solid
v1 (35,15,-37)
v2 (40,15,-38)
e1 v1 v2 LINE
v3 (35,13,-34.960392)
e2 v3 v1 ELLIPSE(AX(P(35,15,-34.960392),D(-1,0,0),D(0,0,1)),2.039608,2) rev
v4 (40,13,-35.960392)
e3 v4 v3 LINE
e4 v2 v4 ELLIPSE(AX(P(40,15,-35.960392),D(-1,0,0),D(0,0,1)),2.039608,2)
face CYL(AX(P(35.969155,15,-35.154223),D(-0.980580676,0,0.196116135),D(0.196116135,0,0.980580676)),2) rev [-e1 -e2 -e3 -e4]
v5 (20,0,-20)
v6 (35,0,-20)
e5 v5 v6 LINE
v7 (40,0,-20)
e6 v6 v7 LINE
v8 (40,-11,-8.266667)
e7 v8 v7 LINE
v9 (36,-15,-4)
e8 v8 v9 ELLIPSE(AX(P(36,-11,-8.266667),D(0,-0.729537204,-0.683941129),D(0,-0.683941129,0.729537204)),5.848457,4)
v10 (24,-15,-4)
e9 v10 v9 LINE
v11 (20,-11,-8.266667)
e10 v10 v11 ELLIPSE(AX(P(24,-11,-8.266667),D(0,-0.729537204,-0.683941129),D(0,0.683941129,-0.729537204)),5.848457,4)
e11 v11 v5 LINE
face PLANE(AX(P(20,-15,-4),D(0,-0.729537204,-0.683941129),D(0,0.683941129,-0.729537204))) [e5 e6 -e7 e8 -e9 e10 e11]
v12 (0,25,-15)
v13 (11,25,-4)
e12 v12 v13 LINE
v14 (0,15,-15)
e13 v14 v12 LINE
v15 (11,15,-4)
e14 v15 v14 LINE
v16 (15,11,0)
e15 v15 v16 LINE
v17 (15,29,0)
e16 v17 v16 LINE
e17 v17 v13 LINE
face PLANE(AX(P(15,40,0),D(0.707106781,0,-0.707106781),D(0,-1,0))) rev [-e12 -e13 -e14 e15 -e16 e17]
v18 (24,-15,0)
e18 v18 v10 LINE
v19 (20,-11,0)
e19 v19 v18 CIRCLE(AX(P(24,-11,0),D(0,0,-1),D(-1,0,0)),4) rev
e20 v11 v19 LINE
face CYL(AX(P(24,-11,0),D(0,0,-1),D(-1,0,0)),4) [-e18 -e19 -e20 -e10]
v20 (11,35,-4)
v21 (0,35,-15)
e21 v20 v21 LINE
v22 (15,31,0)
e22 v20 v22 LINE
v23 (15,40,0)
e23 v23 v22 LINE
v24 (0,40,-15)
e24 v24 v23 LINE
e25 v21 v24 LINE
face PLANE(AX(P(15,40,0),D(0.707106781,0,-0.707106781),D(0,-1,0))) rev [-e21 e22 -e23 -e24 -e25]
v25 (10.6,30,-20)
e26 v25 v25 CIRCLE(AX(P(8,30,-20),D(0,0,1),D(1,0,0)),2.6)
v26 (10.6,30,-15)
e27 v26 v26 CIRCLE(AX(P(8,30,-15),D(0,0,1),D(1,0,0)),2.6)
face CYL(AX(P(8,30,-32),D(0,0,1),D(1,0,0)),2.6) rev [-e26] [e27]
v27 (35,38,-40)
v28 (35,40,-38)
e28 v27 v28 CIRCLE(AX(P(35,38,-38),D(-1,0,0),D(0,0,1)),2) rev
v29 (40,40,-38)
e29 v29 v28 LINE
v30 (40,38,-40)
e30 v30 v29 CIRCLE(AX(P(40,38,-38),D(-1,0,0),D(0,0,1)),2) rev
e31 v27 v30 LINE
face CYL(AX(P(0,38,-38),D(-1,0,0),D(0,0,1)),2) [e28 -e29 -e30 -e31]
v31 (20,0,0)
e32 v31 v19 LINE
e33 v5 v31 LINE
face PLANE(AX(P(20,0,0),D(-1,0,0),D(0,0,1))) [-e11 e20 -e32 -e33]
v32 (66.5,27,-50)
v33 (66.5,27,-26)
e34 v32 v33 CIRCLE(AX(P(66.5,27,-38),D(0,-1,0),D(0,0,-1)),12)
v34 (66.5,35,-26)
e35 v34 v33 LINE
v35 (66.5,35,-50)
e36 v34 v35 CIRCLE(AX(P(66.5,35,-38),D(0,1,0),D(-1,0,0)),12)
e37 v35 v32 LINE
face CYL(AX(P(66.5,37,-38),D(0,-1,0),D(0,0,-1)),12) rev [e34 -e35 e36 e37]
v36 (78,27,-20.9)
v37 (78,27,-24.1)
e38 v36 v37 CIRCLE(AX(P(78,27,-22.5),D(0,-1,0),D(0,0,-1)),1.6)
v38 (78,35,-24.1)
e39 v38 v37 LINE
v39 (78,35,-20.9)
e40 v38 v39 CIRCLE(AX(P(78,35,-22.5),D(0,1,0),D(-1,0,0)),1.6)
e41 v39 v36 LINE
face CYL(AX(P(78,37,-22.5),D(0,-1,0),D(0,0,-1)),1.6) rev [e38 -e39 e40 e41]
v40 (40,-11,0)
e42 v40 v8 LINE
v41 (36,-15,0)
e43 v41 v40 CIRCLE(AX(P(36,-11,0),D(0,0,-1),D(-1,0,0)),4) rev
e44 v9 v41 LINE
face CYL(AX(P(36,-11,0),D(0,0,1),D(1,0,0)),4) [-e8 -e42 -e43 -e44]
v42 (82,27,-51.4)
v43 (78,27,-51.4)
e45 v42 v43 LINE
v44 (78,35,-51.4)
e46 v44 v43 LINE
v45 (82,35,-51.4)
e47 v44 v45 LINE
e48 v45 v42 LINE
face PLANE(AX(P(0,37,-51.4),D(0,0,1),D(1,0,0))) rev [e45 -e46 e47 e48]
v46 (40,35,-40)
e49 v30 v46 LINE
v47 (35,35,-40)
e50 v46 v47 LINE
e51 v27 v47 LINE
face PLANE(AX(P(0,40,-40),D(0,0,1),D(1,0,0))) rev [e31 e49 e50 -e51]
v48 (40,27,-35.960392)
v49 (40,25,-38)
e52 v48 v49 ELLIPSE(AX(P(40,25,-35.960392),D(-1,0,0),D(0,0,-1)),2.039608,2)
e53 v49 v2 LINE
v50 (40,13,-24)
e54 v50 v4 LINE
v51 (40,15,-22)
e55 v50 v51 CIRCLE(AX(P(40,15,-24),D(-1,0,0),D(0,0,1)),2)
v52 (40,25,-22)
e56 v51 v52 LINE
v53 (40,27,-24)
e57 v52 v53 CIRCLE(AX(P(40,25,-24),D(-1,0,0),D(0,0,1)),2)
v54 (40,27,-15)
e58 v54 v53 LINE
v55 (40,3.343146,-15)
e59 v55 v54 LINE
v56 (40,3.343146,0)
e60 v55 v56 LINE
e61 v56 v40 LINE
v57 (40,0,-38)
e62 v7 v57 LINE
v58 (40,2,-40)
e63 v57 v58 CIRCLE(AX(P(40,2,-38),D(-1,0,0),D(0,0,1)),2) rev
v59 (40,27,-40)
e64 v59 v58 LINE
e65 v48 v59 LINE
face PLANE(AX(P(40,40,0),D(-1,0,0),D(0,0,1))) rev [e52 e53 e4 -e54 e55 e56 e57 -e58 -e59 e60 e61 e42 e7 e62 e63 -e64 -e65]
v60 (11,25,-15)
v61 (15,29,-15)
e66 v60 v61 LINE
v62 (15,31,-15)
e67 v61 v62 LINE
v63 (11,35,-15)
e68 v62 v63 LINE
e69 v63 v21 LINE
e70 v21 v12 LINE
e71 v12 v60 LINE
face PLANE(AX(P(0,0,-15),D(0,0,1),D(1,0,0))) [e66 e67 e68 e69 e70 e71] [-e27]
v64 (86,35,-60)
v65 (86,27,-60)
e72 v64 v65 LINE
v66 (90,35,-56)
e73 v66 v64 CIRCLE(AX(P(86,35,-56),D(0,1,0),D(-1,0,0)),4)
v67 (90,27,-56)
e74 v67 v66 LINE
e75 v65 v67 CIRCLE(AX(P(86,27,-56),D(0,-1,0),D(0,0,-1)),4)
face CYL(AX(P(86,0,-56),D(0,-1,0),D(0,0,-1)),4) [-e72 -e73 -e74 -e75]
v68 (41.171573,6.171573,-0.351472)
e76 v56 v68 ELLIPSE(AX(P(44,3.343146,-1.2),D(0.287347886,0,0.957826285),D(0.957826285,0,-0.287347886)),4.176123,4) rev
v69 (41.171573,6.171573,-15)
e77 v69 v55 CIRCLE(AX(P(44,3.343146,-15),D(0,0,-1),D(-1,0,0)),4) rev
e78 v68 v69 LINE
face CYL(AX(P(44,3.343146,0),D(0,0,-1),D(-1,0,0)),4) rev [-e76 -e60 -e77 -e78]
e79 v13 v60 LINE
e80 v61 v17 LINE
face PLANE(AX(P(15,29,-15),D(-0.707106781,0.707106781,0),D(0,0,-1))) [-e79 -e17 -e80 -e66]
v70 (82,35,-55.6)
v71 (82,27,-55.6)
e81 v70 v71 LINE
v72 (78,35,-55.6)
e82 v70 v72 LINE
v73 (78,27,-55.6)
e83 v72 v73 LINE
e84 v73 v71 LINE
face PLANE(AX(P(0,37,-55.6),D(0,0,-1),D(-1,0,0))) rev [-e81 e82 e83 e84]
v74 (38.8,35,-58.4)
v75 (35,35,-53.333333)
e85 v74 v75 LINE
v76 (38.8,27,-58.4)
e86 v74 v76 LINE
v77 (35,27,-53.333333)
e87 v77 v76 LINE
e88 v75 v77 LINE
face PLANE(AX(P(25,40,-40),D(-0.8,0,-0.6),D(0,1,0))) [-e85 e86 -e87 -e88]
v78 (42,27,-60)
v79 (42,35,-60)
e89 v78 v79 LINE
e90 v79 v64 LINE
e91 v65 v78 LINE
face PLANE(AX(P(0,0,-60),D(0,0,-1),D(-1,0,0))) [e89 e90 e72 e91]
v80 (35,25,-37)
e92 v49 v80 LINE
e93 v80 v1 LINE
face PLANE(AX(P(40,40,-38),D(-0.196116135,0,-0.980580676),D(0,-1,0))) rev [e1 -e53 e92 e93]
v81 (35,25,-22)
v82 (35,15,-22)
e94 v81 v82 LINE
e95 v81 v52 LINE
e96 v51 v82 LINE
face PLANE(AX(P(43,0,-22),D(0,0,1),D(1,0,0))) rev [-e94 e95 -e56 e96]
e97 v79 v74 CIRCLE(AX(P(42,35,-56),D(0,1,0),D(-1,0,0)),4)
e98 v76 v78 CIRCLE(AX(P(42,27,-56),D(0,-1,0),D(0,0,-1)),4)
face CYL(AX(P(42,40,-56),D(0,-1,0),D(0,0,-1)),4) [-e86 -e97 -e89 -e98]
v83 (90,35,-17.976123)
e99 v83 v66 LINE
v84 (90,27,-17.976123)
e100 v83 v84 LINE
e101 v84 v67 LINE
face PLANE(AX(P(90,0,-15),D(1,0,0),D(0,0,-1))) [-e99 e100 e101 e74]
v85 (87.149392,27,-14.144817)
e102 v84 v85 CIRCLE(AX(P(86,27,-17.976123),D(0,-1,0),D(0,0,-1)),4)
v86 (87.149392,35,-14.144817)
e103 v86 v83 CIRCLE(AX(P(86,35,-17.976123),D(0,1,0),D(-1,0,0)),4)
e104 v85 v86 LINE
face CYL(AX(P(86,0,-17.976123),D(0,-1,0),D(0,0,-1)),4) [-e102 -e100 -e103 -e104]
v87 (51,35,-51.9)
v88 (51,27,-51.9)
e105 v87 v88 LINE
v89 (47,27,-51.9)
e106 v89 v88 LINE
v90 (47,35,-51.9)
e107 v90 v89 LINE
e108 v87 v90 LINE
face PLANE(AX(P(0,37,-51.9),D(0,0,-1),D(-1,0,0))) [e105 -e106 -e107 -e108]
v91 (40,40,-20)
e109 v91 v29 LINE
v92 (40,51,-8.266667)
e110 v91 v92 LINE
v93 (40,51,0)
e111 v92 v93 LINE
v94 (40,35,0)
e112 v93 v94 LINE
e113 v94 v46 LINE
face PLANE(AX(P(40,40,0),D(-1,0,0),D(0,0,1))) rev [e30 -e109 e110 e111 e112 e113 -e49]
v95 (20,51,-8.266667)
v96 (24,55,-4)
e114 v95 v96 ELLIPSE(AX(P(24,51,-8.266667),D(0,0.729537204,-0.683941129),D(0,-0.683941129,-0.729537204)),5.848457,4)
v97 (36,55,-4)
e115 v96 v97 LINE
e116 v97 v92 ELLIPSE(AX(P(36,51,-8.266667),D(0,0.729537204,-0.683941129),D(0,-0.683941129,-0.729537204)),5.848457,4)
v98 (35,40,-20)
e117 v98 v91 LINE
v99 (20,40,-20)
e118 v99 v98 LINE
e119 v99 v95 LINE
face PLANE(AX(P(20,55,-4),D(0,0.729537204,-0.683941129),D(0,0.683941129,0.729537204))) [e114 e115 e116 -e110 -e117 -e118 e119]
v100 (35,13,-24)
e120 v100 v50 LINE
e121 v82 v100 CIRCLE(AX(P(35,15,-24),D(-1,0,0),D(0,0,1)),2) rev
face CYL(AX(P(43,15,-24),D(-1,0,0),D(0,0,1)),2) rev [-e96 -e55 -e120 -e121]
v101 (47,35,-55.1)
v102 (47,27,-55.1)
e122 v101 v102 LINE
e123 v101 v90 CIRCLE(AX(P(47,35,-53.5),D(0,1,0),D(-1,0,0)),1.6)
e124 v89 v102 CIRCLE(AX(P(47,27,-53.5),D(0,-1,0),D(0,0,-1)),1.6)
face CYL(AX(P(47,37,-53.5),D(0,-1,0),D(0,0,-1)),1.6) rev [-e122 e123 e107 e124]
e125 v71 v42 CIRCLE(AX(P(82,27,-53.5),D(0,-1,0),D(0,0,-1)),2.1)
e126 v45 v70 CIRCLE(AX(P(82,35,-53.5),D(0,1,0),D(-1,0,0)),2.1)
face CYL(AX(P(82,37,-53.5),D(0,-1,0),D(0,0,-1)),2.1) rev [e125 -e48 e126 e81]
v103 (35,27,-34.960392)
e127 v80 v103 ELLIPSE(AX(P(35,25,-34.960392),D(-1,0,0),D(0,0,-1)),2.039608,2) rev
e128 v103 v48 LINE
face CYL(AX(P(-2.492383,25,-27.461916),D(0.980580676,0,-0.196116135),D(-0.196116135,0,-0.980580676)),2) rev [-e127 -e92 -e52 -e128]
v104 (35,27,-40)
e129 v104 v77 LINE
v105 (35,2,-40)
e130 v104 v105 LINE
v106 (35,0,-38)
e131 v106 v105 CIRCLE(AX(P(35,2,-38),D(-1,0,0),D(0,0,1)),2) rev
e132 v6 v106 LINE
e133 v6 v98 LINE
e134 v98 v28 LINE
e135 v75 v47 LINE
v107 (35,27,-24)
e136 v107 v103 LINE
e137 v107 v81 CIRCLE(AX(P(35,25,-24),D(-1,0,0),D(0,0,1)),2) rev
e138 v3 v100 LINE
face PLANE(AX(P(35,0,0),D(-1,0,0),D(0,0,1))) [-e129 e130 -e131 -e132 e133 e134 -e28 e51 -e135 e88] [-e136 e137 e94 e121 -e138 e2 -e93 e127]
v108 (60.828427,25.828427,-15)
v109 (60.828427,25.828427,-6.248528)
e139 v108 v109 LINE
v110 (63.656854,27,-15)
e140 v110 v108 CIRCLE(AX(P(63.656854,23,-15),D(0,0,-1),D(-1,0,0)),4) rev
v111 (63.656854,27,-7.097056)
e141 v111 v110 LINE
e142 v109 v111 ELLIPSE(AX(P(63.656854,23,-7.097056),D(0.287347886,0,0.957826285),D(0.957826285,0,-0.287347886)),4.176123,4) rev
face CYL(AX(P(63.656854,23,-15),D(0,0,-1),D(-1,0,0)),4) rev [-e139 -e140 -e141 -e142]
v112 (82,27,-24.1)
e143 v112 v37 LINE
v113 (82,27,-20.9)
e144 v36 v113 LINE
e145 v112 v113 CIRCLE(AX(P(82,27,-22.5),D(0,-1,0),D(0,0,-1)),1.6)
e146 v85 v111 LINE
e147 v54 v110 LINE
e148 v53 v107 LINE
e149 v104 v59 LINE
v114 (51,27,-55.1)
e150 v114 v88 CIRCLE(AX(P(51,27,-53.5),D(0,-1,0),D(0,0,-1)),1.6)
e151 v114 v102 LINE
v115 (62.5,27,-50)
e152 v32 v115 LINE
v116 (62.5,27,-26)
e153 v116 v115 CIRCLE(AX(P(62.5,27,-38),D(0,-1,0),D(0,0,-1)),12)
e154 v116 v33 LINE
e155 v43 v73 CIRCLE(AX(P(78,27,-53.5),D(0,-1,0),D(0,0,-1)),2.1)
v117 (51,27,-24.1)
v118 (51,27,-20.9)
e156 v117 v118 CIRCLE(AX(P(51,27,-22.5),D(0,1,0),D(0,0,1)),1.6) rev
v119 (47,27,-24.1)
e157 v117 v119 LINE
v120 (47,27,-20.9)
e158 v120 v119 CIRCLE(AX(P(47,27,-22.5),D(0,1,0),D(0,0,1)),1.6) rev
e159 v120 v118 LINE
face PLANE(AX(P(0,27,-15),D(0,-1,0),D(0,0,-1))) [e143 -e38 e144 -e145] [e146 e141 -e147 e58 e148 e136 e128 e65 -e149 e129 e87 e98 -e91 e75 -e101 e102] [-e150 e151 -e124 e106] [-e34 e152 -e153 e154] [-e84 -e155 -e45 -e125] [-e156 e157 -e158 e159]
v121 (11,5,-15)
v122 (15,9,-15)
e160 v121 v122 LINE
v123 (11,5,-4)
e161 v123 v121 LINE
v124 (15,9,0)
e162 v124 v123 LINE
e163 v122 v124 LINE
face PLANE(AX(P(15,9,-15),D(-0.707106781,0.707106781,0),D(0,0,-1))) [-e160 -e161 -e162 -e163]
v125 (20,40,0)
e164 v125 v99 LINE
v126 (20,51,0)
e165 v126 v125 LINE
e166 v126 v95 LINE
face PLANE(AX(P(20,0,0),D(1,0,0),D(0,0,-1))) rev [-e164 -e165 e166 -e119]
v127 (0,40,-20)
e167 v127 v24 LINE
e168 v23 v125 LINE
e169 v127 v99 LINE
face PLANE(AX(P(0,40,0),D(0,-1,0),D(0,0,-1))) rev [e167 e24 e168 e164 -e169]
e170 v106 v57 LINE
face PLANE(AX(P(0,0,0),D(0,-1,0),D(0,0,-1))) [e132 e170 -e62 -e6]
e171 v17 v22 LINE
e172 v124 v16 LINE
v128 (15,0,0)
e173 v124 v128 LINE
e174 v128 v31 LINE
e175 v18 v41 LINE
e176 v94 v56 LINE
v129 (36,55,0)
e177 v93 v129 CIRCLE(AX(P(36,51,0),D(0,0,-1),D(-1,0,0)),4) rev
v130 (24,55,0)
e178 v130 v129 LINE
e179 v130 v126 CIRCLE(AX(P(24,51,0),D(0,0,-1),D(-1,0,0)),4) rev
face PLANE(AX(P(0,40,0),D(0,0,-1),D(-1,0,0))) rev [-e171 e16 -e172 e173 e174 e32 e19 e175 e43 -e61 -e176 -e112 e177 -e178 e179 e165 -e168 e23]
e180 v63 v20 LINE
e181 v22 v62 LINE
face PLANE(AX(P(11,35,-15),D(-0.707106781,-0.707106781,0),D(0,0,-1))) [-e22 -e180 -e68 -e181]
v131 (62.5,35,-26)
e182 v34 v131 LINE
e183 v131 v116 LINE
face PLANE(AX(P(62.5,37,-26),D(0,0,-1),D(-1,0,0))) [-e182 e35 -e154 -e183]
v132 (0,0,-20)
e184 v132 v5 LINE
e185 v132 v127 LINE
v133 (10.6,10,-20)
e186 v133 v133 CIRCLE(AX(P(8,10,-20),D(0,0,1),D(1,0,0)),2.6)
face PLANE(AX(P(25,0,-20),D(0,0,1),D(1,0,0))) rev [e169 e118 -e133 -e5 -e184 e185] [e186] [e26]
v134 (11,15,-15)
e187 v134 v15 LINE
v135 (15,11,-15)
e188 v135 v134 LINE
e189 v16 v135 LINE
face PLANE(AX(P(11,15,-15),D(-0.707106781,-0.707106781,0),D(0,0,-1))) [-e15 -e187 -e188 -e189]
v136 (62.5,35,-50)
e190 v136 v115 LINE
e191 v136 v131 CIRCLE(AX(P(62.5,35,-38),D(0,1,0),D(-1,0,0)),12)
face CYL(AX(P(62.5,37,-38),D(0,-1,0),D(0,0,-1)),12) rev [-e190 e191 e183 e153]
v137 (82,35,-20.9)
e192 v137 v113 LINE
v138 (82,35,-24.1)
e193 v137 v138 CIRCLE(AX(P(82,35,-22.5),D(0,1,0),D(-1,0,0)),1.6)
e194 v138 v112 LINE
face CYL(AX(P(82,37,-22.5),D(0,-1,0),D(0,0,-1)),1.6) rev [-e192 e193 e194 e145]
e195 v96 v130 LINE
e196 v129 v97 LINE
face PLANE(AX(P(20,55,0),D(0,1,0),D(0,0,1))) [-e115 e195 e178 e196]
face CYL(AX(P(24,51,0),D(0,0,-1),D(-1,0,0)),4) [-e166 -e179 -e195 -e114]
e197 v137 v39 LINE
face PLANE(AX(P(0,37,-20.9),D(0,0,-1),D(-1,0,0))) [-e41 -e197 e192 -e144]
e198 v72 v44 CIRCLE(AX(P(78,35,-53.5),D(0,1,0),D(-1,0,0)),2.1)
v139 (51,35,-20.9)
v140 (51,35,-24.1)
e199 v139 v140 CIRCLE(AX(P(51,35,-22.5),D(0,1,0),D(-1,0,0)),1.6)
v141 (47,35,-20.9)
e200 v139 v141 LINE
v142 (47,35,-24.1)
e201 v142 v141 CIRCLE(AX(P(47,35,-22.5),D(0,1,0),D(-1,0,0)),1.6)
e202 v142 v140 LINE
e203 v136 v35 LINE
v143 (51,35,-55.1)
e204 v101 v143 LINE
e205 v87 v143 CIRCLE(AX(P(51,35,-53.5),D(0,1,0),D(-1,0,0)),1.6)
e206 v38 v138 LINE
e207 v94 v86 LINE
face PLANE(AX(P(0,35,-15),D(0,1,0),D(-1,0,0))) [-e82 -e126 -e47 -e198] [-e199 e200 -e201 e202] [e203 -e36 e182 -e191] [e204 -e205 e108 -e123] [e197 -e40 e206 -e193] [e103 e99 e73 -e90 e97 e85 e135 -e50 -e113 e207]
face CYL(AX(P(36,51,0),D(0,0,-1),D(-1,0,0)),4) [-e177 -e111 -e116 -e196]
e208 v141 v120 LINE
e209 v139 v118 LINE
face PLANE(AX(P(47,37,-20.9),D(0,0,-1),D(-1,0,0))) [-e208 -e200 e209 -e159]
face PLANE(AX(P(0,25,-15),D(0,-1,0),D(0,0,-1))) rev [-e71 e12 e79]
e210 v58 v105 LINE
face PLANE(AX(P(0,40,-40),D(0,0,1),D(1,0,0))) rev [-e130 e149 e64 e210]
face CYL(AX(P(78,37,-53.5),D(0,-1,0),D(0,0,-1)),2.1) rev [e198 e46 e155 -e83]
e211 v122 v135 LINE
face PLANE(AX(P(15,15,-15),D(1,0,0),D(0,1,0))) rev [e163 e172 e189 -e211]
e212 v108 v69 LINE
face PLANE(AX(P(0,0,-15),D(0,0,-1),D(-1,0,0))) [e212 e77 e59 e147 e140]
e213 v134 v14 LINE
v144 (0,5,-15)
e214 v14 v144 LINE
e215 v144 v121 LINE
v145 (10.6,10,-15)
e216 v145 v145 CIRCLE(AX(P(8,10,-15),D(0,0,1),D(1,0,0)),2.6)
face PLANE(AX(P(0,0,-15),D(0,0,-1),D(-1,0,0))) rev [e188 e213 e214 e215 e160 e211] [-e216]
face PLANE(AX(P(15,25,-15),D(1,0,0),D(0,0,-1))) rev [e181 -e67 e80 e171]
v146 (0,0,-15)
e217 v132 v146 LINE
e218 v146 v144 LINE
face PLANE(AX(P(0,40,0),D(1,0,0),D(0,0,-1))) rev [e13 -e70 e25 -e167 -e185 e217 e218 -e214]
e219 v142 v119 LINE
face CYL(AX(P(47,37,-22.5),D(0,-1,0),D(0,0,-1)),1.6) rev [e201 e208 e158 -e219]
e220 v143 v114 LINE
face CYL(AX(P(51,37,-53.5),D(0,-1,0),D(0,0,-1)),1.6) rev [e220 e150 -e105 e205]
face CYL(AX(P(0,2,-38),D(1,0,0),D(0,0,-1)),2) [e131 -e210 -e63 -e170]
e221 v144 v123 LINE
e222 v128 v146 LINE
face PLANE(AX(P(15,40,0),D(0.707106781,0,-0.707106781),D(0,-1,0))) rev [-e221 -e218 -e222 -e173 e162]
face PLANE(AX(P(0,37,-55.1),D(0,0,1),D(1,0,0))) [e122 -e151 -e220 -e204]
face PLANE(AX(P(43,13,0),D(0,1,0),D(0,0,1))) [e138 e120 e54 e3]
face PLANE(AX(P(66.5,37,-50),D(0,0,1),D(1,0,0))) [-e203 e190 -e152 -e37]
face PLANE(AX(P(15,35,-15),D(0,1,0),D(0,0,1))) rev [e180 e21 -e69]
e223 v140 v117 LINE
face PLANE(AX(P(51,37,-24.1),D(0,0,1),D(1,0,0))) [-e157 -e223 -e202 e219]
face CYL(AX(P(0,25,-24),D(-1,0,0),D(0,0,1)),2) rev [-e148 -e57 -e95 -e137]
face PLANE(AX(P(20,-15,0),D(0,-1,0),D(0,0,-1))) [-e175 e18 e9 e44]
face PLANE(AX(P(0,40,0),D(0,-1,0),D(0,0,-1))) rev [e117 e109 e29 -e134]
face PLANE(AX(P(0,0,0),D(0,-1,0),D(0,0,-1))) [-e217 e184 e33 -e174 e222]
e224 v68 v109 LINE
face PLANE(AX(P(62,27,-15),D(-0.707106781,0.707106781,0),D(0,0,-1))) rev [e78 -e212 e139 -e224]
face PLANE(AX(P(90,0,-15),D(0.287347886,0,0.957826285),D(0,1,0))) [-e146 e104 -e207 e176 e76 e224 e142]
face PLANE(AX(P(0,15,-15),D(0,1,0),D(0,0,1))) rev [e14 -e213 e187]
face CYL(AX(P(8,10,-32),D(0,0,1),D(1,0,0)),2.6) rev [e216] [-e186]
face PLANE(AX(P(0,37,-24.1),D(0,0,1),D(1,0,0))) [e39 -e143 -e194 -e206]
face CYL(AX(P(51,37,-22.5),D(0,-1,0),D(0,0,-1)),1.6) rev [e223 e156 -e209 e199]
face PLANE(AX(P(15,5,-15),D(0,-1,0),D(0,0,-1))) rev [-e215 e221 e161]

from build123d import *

# Parameters (mm, degrees)
SKETCH1_W                = 40
SKETCH1_H                = 40
BOSS_EXTRUDE1_DEPTH      = 40
SKETCH2_W                = 25
SKETCH2_H                = 20
CUT_EXTRUDE1_DEPTH       = 40
CHAMFER1_SIZE            = 15
CUT_EXTRUDE2_DEPTH       = 15
CHAMFER2_SIZE            = 4
SKETCH4_R                = 2.6
CUT_EXTRUDE3_DEPTH       = 17
BOSS_EXTRUDE3_DEPTH      = 20
FILLET3_R                = 4
BOSS_EXTRUDE2_DEPTH      = 20
BOSS_EXTRUDE2_DEPTH_BACK = 25
SKETCH5_W                = 50
SKETCH5_H                = 8
CUT_EXTRUDE4_DEPTH       = 10
CHAMFER3_SIZE            = 15
CHAMFER3_SIZE_2          = 20
CHAMFER4_SIZE2           = 50
CHAMFER4_SIZE            = 15
FILLET5_START            = 26
FILLET5_DEPTH            = 10
FILLET6_R                = 2
CHAMFER5_START           = -40
CHAMFER5_DEPTH           = 40
CHAMFER5_START_2         = 2
CHAMFER5_2_DEPTH         = 25
SKETCH11_W               = 27.237482008
SKETCH11_H               = 25
CUT_EXTRUDE5_DEPTH       = 25
FILLET7_R                = 4
SKETCH16_W               = 14
SKETCH16_H               = 14
CUT_EXTRUDE6_DEPTH       = 43
CHAMFER6_SIZE            = 2
CHAMFER6_SIZE2           = 10
FILLET9_R                = 2
CUT_EXTRUDE7_DEPTH       = 10


with BuildPart() as part:
    # Sketch1 → Boss-Extrude1 (new body)
    with BuildSketch(Plane(origin=(0, 0, 0), x_dir=(1, 0, 0), z_dir=(0, 1, 0))):
        with Locations((20, 20)):
            Rectangle(SKETCH1_W, SKETCH1_H)
    extrude(amount=BOSS_EXTRUDE1_DEPTH)

    # Sketch2 → Cut-Extrude1 (cut)
    with BuildSketch(Plane(origin=(0, 40, 0), x_dir=(1, 0, 0), z_dir=(0, 1, 0))):
        with Locations((12.5, 30)):
            Rectangle(SKETCH2_W, SKETCH2_H)
    extrude(amount=-CUT_EXTRUDE1_DEPTH, mode=Mode.SUBTRACT)

    # Chamfer1
    chamfer1_edges = [part.edges().sort_by_distance(p)[0] for p in [
        (0, 20, 0),
    ]]
    chamfer(chamfer1_edges, length=CHAMFER1_SIZE)

    # Sketch3 → Cut-Extrude2 (cut)
    with BuildSketch(Plane.XY):
        Polygon((0, 10), (0, 15), (15, 15), (15, 5), (0, 5), align=None)
        Polygon((0, 30), (0, 25), (15, 25), (15, 35), (0, 35), align=None)
    extrude(amount=-CUT_EXTRUDE2_DEPTH, mode=Mode.SUBTRACT)

    # Chamfer2
    chamfer2_edges = [part.edges().sort_by_distance(p)[0] for p in [
        (15, 35, -7.5),
        (15, 25, -7.5),
        (15, 15, -7.5),
        (15, 5, -7.5),
    ]]
    chamfer(chamfer2_edges, length=CHAMFER2_SIZE)

    # Sketch4 → Cut-Extrude3 (cut)
    with BuildSketch(Plane.XY.offset(-15)):
        with Locations((8, 30)):
            Circle(SKETCH4_R)
        with Locations((8, 10)):
            Circle(SKETCH4_R)
    extrude(amount=-CUT_EXTRUDE3_DEPTH, mode=Mode.SUBTRACT)

    # Sketch9 → Boss-Extrude3 (add)
    with BuildSketch(Plane(origin=(40, 0, 0), x_dir=(0, 0, -1), z_dir=(1, 0, 0))):
        Polygon((0, 40), (0, 55), (4, 55), (20, 40), align=None)
        Polygon((0, 0), (0, -15), (4, -15), (20, 0), align=None)
    extrude(amount=-BOSS_EXTRUDE3_DEPTH)

    # Fillet3
    fillet3_edges = [part.edges().sort_by_distance(p)[0] for p in [
        (20, 55, -2),
        (40, 55, -2),
        (20, -15, -2),
        (40, -15, -2),
    ]]
    fillet(fillet3_edges, radius=FILLET3_R)

    # Sketch5 → Boss-Extrude2 (add, two sides: drawn at the far end of the back side and taken through both)
    with BuildSketch(Plane(origin=(0, 0, -40), x_dir=(-1, 0, 0), z_dir=(0, 0, -1)).offset(-BOSS_EXTRUDE2_DEPTH_BACK)):
        with Locations((-65, 31)):
            Rectangle(SKETCH5_W, SKETCH5_H)
    extrude(amount=BOSS_EXTRUDE2_DEPTH + BOSS_EXTRUDE2_DEPTH_BACK)

    # Sketch10 → Cut-Extrude4 (cut)
    with BuildSketch(Plane(origin=(0, 27, 0), x_dir=(-1, 0, 0), z_dir=(0, -1, 0))):
        with BuildLine():
            ThreePointArc((-47, 51.9), (-45.4, 53.5), (-47, 55.1))
            Line((-47, 55.1), (-51, 55.1))
            ThreePointArc((-51, 55.1), (-52.13137085, 54.63137085), (-52.6, 53.5))
            ThreePointArc((-52.6, 53.5), (-52.13137085, 52.36862915), (-51, 51.9))
            Line((-51, 51.9), (-47, 51.9))
        make_face()
        with BuildLine():
            ThreePointArc((-47, 20.9), (-45.4, 22.5), (-47, 24.1))
            Line((-47, 24.1), (-51, 24.1))
            ThreePointArc((-51, 24.1), (-52.6, 22.5), (-51, 20.9))
            Line((-51, 20.9), (-47, 20.9))
        make_face()
        with BuildLine():
            ThreePointArc((-78, 20.9), (-76.4, 22.5), (-78, 24.1))
            Line((-78, 24.1), (-82, 24.1))
            ThreePointArc((-82, 24.1), (-83.6, 22.5), (-82, 20.9))
            Line((-82, 20.9), (-78, 20.9))
        make_face()
        with BuildLine():
            ThreePointArc((-66.5, 50), (-78.5, 38), (-66.5, 26))
            Line((-66.5, 26), (-62.5, 26))
            ThreePointArc((-62.5, 26), (-50.5, 38), (-62.5, 50))
            Line((-62.5, 50), (-66.5, 50))
        make_face()
        with BuildLine():
            ThreePointArc((-78, 51.4), (-75.9, 53.5), (-78, 55.6))
            Line((-78, 55.6), (-82, 55.6))
            ThreePointArc((-82, 55.6), (-84.1, 53.5), (-82, 51.4))
            Line((-82, 51.4), (-78, 51.4))
        make_face()
    extrude(amount=-CUT_EXTRUDE4_DEPTH, mode=Mode.SUBTRACT)

    # Chamfer3
    # the kernel refuses this chamfer: 20, 15 mm, written as the material it adds along each edge
    with BuildSketch(Plane(origin=(40, 27, -40), x_dir=(-1, 0, 0), z_dir=(0, 1, 0))) as chamfer3_piece_1:
        Polygon((CHAMFER3_SIZE, 0), (0, -CHAMFER3_SIZE_2), (0, 0), align=None)
    extrude(amount=8)

    # Chamfer4
    chamfer4_edges = [part.edges().sort_by_distance(p)[0] for p in [
        (40, 31, -15),
    ]]
    chamfer4_side = [part.faces().sort_by_distance(p)[0] for p in [
        (40, 31, -14.7),
    ]]
    chamfer(chamfer4_edges, length=CHAMFER4_SIZE - 0.0001, length2=CHAMFER4_SIZE2 - 0.0001, reference=chamfer4_side[0])  # a hair under: the kernel refuses the full size

    # Fillet5: read off the stored shape, not the designer's step
    # Fillet5 outline → Fillet5 (cut)
    with BuildSketch(Plane(origin=(0, 0, 0), x_dir=(1, 0, 0), z_dir=(0, 1, 0)).offset(FILLET5_START)):
        with BuildLine():
            Line((90, 15), (90, 17.976122604))
            ThreePointArc((90, 17.976122604), (89.209171713, 15.588400485), (87.149391542, 14.144817463))
            Line((87.149391542, 14.144817463), (90, 15))
        make_face()
        with BuildLine():
            ThreePointArc((38.8, 58.4), (40.211145618, 59.577708764), (42, 60))
            Line((42, 60), (40, 60))
            Line((40, 60), (38.8, 58.4))
        make_face()
        with BuildLine():
            ThreePointArc((86, 60), (88.828427125, 58.828427125), (90, 56))
            Line((90, 56), (90, 60))
            Line((90, 60), (86, 60))
        make_face()
    extrude(amount=FILLET5_DEPTH, mode=Mode.SUBTRACT)

    # Fillet6
    fillet6_edges = [part.edges().sort_by_distance(p)[0] for p in [
        (32.5, 40, -40),
        (32.5, 0, -40),
    ]]
    fillet(fillet6_edges, radius=FILLET6_R)

    # Chamfer5: read off the stored shape, not the designer's step
    # Chamfer5 outline → Chamfer5 (add)
    with BuildSketch(Plane.XY.offset(CHAMFER5_START)):
        Polygon((40, 5), (62, 27), (40, 27), align=None)
    extrude(amount=CHAMFER5_DEPTH)

    # Chamfer5 2 outline → Chamfer5 2 (cut)
    with BuildSketch(Plane(origin=(0, 0, 0), x_dir=(1, 0, 0), z_dir=(0, 1, 0)).offset(CHAMFER5_START_2)):
        with BuildLine():
            Line((51, 24.1), (47, 24.1))
            ThreePointArc((47, 24.1), (45.4, 22.5), (47, 20.9))
            Line((47, 20.9), (51, 20.9))
            ThreePointArc((51, 20.9), (52.6, 22.5), (51, 24.1))
        make_face()
        with BuildLine():
            ThreePointArc((50.667840434, 40), (53.33484861, 30.254033308), (62.5, 26))
            Line((62.5, 26), (64, 26))
            Line((64, 26), (64, 40))
            Line((64, 40), (50.667840434, 40))
        make_face()
        Polygon((64, 0), (64, 7.2), (40, 0), align=None)
    extrude(amount=CHAMFER5_2_DEPTH, mode=Mode.SUBTRACT)

    # Sketch11 → Cut-Extrude5 (cut)
    with BuildSketch(Plane(origin=(0, 0, -40), x_dir=(-1, 0, 0), z_dir=(0, 0, -1))):
        with Locations((-53.618741004, 14.5)):
            Rectangle(SKETCH11_W, SKETCH11_H)
    extrude(amount=-CUT_EXTRUDE5_DEPTH, mode=Mode.SUBTRACT)

    # Fillet7
    fillet7_edges = [part.edges().sort_by_distance(p)[0] for p in [
        (62, 27, -10.8000346),
        (40, 5, -7.5),
    ]]
    fillet(fillet7_edges, radius=FILLET7_R)

    # Sketch16 → Cut-Extrude6 (cut)
    with BuildSketch(Plane.ZY):
        with Locations((-29, 20)):
            Rectangle(SKETCH16_W, SKETCH16_H)
    extrude(amount=-CUT_EXTRUDE6_DEPTH, mode=Mode.SUBTRACT)

    # Chamfer6
    chamfer6_edges = [part.edges().sort_by_distance(p)[0] for p in [
        (40, 20, -36),
    ]]
    chamfer6_side = [part.faces().sort_by_distance(p)[0] for p in [
        (40, 6.638609855, -21.034394019),
    ]]
    chamfer(chamfer6_edges, length=CHAMFER6_SIZE, length2=CHAMFER6_SIZE2, reference=chamfer6_side[0])

    # Fillet9
    fillet9_edges = [part.edges().sort_by_distance(p)[0] for p in [
        (32.5, 13, -22),
        (32.5, 27, -22),
        (27.5, 27, -36),
        (27.5, 13, -36),
        (35, 13, -37),
        (35, 27, -37),
    ]]
    fillet(fillet9_edges, radius=FILLET9_R)

    # Sketch17 → Cut-Extrude7 (cut)
    with BuildSketch(Plane.ZY.offset(-25)):
        Polygon((-20, 0), (-20, 45.439025914), (-90.041383554, 45.439025914), (-90.041383554, -69.890024076), align=None)
    extrude(amount=-CUT_EXTRUDE7_DEPTH, mode=Mode.SUBTRACT)


solid = part.part
